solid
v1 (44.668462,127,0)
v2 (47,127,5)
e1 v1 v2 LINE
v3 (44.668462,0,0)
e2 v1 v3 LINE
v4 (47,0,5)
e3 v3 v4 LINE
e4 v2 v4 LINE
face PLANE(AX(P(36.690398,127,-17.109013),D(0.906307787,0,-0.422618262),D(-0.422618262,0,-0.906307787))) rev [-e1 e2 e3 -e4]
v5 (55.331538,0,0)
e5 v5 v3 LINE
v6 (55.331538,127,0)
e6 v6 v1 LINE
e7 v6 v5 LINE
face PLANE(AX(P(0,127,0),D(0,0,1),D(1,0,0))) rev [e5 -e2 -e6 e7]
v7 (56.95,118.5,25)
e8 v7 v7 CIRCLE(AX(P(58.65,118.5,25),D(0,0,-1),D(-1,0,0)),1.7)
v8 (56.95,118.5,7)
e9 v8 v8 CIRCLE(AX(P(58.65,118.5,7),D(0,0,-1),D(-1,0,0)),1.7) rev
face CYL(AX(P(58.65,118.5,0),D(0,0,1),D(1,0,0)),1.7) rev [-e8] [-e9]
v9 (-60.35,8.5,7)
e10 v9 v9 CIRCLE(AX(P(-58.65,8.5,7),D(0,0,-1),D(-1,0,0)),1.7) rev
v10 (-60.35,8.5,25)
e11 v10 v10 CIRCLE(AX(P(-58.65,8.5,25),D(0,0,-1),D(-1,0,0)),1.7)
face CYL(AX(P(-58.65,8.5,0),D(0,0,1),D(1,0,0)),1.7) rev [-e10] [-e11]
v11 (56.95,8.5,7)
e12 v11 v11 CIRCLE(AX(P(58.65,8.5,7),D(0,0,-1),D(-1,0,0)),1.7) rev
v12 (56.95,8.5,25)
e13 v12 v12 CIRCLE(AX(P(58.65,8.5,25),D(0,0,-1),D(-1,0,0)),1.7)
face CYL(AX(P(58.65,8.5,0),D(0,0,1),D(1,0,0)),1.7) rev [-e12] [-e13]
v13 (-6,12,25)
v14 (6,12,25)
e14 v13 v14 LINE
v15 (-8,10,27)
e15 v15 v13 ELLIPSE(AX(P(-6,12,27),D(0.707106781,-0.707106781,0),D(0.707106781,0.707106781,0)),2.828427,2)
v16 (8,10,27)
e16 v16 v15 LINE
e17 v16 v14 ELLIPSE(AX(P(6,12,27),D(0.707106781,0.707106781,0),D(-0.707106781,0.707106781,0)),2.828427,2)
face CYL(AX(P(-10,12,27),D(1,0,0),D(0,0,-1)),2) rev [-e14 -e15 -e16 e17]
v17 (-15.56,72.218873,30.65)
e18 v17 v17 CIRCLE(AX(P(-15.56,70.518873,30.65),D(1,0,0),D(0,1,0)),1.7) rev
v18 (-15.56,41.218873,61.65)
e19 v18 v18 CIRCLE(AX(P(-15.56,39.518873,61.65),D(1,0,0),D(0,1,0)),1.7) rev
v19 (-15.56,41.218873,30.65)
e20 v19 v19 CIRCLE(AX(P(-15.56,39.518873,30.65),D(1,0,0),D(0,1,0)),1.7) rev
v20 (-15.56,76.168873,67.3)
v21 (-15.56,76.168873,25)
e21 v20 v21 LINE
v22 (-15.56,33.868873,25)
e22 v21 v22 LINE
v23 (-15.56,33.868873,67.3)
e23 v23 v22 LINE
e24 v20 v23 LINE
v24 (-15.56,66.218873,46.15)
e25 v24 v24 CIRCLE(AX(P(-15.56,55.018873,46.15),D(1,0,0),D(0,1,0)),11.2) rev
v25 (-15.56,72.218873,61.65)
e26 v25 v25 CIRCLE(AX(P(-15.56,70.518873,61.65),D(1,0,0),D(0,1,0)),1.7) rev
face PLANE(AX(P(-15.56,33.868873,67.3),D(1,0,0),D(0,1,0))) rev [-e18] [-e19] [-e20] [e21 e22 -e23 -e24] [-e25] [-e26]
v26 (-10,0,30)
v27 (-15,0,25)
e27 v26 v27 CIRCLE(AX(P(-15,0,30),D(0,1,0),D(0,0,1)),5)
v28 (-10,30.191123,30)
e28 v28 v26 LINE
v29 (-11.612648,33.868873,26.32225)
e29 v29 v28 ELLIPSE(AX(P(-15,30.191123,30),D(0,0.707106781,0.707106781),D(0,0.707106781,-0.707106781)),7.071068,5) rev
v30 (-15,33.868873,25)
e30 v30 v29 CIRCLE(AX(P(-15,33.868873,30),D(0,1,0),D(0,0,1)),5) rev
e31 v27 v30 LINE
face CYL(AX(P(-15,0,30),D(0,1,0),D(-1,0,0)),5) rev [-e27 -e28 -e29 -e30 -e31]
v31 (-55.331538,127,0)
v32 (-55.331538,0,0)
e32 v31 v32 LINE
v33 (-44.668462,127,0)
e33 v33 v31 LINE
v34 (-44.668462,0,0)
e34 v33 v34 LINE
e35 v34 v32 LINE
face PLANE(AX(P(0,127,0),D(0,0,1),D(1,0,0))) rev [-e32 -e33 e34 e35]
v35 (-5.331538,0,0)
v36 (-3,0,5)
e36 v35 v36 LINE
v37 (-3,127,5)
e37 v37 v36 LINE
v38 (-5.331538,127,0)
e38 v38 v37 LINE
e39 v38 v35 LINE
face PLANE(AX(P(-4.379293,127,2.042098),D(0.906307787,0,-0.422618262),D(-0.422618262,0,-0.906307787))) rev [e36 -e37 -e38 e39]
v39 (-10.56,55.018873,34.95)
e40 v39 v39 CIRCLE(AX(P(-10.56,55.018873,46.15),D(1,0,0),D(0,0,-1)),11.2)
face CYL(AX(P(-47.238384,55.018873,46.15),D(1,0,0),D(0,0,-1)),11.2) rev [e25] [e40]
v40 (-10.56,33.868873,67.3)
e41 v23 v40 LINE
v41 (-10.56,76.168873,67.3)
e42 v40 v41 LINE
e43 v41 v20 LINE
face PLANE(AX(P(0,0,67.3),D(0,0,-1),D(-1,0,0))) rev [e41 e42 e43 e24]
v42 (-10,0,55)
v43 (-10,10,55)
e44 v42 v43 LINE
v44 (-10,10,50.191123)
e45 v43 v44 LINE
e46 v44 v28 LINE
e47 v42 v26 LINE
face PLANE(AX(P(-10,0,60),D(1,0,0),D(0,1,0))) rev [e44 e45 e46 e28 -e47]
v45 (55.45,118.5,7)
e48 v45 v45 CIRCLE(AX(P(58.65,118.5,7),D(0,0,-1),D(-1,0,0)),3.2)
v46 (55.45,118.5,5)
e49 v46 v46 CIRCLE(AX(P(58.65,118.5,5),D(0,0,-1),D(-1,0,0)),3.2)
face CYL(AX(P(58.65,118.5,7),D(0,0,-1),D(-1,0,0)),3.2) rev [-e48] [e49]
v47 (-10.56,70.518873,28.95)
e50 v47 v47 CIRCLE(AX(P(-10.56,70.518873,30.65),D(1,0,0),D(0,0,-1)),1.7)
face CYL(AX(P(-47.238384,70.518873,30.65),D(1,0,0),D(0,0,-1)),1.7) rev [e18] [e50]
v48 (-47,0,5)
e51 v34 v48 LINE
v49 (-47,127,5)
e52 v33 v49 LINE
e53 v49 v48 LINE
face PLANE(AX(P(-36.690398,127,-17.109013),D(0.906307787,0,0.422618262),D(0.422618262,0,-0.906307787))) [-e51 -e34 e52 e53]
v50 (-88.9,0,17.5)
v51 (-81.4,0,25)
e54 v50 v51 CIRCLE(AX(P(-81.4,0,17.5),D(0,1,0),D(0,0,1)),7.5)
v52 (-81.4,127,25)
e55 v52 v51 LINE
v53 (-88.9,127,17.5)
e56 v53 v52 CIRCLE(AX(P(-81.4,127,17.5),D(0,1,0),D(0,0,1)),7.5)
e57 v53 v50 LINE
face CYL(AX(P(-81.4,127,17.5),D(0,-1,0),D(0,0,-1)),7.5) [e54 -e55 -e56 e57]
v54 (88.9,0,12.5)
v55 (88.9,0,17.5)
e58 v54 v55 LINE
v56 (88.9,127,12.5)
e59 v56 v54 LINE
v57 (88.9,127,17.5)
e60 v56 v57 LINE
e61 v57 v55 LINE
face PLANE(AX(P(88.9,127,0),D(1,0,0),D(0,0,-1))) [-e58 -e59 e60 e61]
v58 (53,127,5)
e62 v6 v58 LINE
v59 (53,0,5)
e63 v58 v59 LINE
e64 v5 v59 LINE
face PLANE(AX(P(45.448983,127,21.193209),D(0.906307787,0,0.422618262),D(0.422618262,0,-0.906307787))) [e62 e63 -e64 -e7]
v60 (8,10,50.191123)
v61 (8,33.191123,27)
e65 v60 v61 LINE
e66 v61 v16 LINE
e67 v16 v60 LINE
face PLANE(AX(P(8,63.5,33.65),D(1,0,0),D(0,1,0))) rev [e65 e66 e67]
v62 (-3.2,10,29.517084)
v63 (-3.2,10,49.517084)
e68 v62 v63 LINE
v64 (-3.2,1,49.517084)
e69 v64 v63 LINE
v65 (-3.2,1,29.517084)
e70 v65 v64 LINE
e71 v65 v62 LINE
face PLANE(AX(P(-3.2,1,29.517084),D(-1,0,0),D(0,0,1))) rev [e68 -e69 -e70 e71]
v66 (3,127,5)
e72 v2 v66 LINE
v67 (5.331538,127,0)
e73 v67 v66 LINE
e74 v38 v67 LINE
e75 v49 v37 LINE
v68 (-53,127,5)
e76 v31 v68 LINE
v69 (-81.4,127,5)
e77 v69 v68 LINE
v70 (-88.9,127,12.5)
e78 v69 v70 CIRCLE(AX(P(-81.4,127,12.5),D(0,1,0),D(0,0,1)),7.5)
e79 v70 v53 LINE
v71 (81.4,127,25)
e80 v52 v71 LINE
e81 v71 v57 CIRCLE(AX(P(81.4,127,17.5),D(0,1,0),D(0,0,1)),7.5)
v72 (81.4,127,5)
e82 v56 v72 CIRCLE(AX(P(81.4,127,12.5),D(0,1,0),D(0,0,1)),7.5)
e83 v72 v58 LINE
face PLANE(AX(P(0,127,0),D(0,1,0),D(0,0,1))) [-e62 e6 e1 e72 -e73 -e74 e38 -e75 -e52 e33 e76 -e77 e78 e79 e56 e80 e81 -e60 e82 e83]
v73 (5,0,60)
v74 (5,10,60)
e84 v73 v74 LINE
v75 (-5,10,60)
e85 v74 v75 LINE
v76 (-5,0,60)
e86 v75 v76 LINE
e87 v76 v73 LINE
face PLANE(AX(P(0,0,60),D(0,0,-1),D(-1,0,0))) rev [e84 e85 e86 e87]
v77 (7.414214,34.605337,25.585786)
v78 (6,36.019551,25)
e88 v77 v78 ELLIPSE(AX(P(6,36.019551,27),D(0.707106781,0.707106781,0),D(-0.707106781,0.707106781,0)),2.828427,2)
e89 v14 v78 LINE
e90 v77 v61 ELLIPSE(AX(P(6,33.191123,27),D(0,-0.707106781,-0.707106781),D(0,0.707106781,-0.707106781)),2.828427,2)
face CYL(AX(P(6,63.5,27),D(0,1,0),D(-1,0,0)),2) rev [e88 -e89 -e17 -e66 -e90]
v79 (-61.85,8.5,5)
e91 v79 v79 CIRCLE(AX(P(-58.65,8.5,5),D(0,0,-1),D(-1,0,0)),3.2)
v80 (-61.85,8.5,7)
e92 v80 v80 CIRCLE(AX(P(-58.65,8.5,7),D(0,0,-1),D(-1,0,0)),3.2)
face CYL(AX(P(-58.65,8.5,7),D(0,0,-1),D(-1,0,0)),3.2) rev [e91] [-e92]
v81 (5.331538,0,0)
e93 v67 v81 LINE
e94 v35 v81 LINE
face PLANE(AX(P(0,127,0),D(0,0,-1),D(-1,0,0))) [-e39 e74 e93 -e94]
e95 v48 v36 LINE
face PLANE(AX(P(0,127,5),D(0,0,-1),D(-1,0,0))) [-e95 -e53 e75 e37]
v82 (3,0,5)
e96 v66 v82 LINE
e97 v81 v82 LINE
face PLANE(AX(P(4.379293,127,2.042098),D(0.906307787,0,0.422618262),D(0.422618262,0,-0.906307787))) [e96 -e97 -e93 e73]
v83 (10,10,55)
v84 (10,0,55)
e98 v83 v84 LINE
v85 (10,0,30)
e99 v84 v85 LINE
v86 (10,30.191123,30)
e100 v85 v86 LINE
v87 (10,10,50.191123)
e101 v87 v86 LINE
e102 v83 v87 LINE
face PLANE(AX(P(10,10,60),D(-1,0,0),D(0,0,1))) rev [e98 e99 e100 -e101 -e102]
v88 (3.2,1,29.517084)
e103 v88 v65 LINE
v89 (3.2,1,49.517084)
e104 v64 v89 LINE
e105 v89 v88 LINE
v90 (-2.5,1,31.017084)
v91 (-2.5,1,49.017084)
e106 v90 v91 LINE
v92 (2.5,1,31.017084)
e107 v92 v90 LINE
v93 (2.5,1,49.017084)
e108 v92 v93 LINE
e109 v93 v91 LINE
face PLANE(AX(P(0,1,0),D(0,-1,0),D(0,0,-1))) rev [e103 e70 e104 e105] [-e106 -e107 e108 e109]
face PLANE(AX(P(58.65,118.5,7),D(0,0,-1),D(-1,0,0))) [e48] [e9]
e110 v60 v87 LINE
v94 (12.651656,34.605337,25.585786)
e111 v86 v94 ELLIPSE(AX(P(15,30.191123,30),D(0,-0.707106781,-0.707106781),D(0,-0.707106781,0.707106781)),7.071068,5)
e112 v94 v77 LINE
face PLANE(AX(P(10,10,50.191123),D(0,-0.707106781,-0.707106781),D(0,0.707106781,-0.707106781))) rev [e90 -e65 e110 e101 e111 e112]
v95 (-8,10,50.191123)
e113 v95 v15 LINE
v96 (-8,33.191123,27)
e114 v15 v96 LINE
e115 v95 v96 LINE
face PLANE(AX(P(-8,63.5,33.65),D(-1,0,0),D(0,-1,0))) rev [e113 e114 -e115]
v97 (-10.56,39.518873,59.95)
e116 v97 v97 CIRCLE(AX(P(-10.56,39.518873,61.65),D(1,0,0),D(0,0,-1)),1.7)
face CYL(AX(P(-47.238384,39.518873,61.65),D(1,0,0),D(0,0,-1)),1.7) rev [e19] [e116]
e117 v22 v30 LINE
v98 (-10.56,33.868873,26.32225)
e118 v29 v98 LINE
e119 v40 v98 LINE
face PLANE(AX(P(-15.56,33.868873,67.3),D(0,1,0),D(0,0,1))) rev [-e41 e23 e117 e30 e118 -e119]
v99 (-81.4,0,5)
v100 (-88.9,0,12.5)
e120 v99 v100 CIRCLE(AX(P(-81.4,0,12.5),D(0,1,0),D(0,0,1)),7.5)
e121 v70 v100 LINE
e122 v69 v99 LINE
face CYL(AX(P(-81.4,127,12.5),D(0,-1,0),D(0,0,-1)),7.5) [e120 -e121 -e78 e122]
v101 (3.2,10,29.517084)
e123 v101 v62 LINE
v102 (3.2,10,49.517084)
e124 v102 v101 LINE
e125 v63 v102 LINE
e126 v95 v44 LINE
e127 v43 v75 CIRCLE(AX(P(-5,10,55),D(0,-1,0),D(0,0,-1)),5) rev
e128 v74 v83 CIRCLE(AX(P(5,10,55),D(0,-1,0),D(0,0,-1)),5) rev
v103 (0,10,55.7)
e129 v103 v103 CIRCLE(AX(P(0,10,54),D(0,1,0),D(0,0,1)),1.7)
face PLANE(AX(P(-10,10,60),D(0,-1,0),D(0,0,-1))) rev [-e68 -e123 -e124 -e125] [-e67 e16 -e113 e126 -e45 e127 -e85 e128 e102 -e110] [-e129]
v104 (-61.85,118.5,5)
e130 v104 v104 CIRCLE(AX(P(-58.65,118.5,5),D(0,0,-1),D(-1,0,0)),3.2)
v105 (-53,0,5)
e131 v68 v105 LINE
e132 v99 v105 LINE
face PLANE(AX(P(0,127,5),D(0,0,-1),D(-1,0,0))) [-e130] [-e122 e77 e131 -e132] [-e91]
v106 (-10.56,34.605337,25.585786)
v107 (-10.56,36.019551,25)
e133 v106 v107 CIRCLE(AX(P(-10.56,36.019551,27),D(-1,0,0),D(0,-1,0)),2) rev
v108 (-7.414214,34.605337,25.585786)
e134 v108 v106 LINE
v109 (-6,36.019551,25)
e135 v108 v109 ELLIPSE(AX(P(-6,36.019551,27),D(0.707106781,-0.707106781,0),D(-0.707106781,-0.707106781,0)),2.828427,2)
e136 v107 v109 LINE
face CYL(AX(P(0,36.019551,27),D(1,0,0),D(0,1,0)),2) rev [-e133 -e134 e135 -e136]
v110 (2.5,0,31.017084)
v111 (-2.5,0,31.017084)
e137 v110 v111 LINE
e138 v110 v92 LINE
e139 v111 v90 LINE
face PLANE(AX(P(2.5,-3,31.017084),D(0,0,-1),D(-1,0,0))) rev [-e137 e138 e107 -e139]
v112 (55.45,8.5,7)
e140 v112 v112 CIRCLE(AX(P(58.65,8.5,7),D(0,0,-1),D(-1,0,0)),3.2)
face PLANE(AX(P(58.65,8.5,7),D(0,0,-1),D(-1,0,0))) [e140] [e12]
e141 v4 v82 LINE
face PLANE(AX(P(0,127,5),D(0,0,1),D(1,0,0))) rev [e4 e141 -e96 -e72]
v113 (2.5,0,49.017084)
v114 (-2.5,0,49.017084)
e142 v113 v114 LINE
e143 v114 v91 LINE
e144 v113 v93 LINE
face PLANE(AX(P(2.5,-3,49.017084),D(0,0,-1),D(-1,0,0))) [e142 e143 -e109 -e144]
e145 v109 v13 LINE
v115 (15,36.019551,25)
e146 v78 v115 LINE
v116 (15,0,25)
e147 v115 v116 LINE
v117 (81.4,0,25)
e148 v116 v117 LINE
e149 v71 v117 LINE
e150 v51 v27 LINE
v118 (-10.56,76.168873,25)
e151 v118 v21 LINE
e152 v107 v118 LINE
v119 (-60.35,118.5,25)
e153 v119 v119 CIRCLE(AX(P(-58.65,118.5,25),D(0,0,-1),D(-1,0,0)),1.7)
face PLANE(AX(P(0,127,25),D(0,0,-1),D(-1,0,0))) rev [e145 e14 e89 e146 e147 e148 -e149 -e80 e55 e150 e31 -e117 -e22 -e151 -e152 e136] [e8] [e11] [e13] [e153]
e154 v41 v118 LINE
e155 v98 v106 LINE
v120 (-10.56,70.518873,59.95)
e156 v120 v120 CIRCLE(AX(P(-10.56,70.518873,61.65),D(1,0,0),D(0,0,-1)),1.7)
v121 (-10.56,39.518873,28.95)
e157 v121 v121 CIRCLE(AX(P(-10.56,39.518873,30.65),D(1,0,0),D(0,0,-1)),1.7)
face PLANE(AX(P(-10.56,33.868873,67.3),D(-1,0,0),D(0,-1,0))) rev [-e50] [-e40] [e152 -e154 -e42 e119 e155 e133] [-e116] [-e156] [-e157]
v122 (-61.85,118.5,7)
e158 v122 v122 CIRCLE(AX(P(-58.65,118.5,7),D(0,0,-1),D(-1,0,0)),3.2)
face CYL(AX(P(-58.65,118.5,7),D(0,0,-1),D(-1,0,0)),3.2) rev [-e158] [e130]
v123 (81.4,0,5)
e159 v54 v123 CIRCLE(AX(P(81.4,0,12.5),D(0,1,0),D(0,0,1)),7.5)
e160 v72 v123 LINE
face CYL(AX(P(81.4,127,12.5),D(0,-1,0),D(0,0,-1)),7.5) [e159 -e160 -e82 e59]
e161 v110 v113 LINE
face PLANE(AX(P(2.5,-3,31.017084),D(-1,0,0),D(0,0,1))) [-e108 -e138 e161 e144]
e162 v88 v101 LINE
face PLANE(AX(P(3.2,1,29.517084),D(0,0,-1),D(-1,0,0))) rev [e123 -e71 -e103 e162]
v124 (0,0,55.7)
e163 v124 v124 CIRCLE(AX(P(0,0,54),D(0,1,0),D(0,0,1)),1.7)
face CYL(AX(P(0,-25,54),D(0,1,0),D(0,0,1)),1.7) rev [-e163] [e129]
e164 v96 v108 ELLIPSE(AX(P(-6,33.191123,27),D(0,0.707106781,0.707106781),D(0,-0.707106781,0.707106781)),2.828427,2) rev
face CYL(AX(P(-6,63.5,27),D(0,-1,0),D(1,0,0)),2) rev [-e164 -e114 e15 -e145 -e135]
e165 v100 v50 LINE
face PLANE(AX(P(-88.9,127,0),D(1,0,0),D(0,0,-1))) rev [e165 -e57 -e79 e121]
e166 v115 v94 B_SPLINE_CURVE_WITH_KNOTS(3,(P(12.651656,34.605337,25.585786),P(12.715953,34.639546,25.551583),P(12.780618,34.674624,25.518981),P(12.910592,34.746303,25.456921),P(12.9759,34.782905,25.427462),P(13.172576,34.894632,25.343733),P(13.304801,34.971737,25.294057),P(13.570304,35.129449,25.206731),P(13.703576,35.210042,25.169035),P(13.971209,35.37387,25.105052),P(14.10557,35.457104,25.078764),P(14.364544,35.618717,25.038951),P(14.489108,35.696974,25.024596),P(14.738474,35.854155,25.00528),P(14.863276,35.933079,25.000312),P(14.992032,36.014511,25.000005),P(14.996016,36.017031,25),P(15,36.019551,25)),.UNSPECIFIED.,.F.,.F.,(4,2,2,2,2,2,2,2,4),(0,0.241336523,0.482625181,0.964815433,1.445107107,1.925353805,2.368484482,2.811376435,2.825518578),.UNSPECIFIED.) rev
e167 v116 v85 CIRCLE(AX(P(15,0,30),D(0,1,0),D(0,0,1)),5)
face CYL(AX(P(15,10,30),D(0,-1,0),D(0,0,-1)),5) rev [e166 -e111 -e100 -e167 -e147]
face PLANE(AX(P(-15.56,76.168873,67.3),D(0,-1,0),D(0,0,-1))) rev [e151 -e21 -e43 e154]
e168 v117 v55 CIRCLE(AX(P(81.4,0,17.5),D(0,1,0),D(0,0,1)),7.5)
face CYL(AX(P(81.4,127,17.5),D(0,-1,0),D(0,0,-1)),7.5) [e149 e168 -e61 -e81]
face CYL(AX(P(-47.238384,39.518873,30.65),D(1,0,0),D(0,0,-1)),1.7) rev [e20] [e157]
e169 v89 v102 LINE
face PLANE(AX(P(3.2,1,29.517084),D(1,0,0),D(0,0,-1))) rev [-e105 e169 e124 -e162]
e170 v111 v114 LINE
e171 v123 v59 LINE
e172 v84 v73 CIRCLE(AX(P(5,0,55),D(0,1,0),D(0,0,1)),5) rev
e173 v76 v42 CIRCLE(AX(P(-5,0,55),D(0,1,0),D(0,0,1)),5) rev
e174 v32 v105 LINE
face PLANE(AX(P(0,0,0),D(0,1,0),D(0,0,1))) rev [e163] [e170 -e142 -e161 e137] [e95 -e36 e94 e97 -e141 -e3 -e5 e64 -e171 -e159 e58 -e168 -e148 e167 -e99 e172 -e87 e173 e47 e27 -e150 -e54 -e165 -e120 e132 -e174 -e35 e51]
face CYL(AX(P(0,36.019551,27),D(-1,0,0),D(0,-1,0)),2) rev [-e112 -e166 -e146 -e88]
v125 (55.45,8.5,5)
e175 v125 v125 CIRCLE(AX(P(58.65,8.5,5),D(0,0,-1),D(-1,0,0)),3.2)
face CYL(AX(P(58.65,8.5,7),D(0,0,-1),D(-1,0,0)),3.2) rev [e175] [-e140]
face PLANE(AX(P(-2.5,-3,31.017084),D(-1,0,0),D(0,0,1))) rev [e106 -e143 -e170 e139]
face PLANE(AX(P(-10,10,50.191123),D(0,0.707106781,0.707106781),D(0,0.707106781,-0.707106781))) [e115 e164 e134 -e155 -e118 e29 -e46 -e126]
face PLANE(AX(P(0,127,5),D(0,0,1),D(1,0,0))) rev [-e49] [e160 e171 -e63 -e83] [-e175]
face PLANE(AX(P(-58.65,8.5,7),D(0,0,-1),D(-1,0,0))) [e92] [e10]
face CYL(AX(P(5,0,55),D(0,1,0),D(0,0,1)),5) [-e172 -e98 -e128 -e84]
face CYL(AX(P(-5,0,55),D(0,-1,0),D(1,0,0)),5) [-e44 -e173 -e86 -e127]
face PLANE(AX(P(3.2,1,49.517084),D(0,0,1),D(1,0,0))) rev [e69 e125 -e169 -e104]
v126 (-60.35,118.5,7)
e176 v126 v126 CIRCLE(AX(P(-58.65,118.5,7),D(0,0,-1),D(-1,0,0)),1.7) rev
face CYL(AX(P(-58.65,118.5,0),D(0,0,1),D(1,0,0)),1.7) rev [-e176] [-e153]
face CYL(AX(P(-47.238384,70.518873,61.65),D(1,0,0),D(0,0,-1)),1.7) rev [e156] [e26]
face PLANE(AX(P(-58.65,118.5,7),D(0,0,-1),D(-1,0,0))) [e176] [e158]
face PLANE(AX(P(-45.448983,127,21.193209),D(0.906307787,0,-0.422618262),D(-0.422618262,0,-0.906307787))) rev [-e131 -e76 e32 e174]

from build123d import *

# Parameters (mm, degrees)
BOSS_EXTRUDE1_DEPTH     = 127
SKETCH3_W               = 5
SKETCH3_H               = 42.3
BOSS_EXTRUDE2_DEPTH     = 42.3
SKETCH4_R               = 1.7
CUT_EXTRUDE1_DEPTH      = 5
CUT_EXTRUDE7_DEPTH      = 161.690696682
CUT_EXTRUDE7_DEPTH_BACK = 161.690696682
SKETCH5_R               = 1.7
SKETCH8_R               = 3.2
CUT_EXTRUDE8_DEPTH      = 2
SKETCH10_W              = 20
SKETCH10_H              = 10
BOSS_EXTRUDE3_DEPTH     = 35
FILLET3_R               = 5
SKETCH12_R              = 1.7
CUT_EXTRUDE9_DEPTH      = 35
RIB47_START             = -2
RIB47_DEPTH             = 2
FILLET7_R               = 5
FILLET8_R               = 2
SKETCH18_W              = 6.4
SKETCH18_H              = 20
CUT_EXTRUDE10_DEPTH     = 9
SKETCH19_W              = 5
SKETCH19_H              = 18
CUT_EXTRUDE11_DEPTH     = 4


# Read off the part's stored shape, not the designer's step: Rib47
with BuildPart() as part:
    # Sketch2 → Boss-Extrude1 (new body)
    with BuildSketch(Plane(origin=(0, 0, 0), x_dir=(1, 0, 0), z_dir=(0, 1, 0))):
        with BuildLine():
            Line((-5.331538291, 0), (-3, -5))
            Line((-3, -5), (-47, -5))
            Line((-47, -5), (-44.668461709, 0))
            Line((-44.668461709, 0), (-55.331538291, 0))
            Line((-55.331538291, 0), (-53, -5))
            Line((-53, -5), (-81.4, -5))
            ThreePointArc((-81.4, -5), (-86.703300859, -7.196699141), (-88.9, -12.5))
            Line((-88.9, -12.5), (-88.9, -17.5))
            ThreePointArc((-88.9, -17.5), (-86.703300859, -22.803300859), (-81.4, -25))
            Line((-81.4, -25), (81.4, -25))
            ThreePointArc((81.4, -25), (86.703300859, -22.803300859), (88.9, -17.5))
            Line((88.9, -17.5), (88.9, -12.5))
            ThreePointArc((88.9, -12.5), (86.703300859, -7.196699141), (81.4, -5))
            Line((81.4, -5), (53, -5))
            Line((53, -5), (55.331538291, 0))
            Line((55.331538291, 0), (44.668461709, 0))
            Line((44.668461709, 0), (47, -5))
            Line((47, -5), (3, -5))
            Line((3, -5), (5.331538291, 0))
            Line((5.331538291, 0), (-5.331538291, 0))
        make_face()
    extrude(amount=BOSS_EXTRUDE1_DEPTH)

    # Sketch3 → Boss-Extrude2 (add)
    with BuildSketch(Plane.XY.offset(25)):
        with Locations((-13.06, 55.018873206)):
            Rectangle(SKETCH3_W, SKETCH3_H)
    extrude(amount=BOSS_EXTRUDE2_DEPTH)

    # Sketch4 → Cut-Extrude1 (cut)
    with BuildSketch(Plane(origin=(-10.56, 0, 0), x_dir=(0, 0, -1), z_dir=(1, 0, 0))):
        with BuildLine():
            ThreePointArc((-34.95, 55.018873206), (-46.15, 66.218873206), (-57.35, 55.018873206))
            Line((-57.35, 55.018873206), (-34.95, 55.018873206))
        make_face()
        with BuildLine():
            Line((-34.95, 55.018873206), (-57.35, 55.018873206))
            ThreePointArc((-57.35, 55.018873206), (-46.15, 43.818873206), (-34.95, 55.018873206))
        make_face()
        with Locations((-61.65, 70.518873206)):
            Circle(SKETCH4_R)
        with Locations((-30.65, 70.518873206)):
            Circle(SKETCH4_R)
        with Locations((-30.65, 39.518873206)):
            Circle(SKETCH4_R)
        with Locations((-61.65, 39.518873206)):
            Circle(SKETCH4_R)
    extrude(amount=-CUT_EXTRUDE1_DEPTH, mode=Mode.SUBTRACT)

    # Sketch5 → Cut-Extrude7 (cut, two sides: drawn at the far end of the back side and taken through both)
    with BuildSketch(Plane.XY.offset(25).offset(-CUT_EXTRUDE7_DEPTH_BACK)):
        with Locations(Location((-58.65, 118.5, 0), (0, 0, 180))):
            Circle(SKETCH5_R)
        with Locations((58.65, 118.5)):
            Circle(SKETCH5_R)
        with Locations((58.65, 8.5)):
            Circle(SKETCH5_R)
        with Locations(Location((-58.65, 8.5, 0), (0, 0, 180))):
            Circle(SKETCH5_R)
    extrude(amount=CUT_EXTRUDE7_DEPTH + CUT_EXTRUDE7_DEPTH_BACK, mode=Mode.SUBTRACT)

    # Sketch8 → Cut-Extrude8 (cut)
    with BuildSketch(Plane(origin=(0, 0, 5), x_dir=(-1, 0, 0), z_dir=(0, 0, -1))):
        with Locations((-58.65, 118.5)):
            Circle(SKETCH8_R)
        with Locations((-58.65, 8.5)):
            Circle(SKETCH8_R)
        with Locations((58.65, 118.5)):
            Circle(SKETCH8_R)
        with Locations((58.65, 8.5)):
            Circle(SKETCH8_R)
    extrude(amount=-CUT_EXTRUDE8_DEPTH, mode=Mode.SUBTRACT)

    # Sketch10 → Boss-Extrude3 (add)
    with BuildSketch(Plane.XY.offset(25)):
        with Locations((0, 5)):
            Rectangle(SKETCH10_W, SKETCH10_H)
    extrude(amount=BOSS_EXTRUDE3_DEPTH)

    # Fillet3
    fillet3_edges = [part.edges().sort_by_distance(p)[0] for p in [
        (-10, 5, 60),
        (10, 5, 60),
    ]]
    fillet(fillet3_edges, radius=FILLET3_R)

    # Sketch12 → Cut-Extrude9 (cut)
    with BuildSketch(Plane(origin=(0, 10, 0), x_dir=(1, 0, 0), z_dir=(0, 1, 0))):
        with Locations(Location((0, -54, 0), (0, 0, 270))):
            Circle(SKETCH12_R)
    extrude(amount=-CUT_EXTRUDE9_DEPTH, mode=Mode.SUBTRACT)

    # Rib47 outline → Rib47 (add)
    with BuildSketch(Plane(origin=(10, 0, 0), x_dir=(0, 0, -1), z_dir=(1, 0, 0)).offset(RIB47_START)):
        Polygon((-25, 35.191123447), (-50.191123447, 10), (-25, 10), align=None)
    rib47 = extrude(amount=RIB47_DEPTH)

    # Mirror1: Rib47 across plane
    add(rib47.mirror(Plane(origin=(0, 0, 0), x_dir=(0, 0, 1), z_dir=(1, 0, 0))))

    # Fillet7
    # the kernel refuses this fillet: 5 mm, written as the material it adds along each edge
    with BuildSketch(Plane(origin=(-10, 47.691123447, 25), x_dir=(-1, 0, 0), z_dir=(0, -1, 0))) as fillet7_piece_1_section:
        with BuildLine():
            CenterArc((FILLET7_R, -FILLET7_R), FILLET7_R, 90, 90)
            Line((0, -FILLET7_R), (0, 0))
            Line((0, 0), (FILLET7_R, 0))
        make_face()
    fillet7_piece_1 = extrude(amount=47.691123447, mode=Mode.PRIVATE)
    fillet7_piece_1 = split(fillet7_piece_1, bisect_by=Plane(origin=(-11.152129269, 25.569946894, 34.621176553), z_dir=(0, -0.7071067811865476, -0.7071067811865476)), keep=Keep.TOP, mode=Mode.PRIVATE)
    add(fillet7_piece_1)
    with BuildSketch(Plane(origin=(10, 47.691123447, 25), x_dir=(0, 0, 1), z_dir=(0, -1, 0))) as fillet7_piece_2_section:
        with BuildLine():
            CenterArc((FILLET7_R, -FILLET7_R), FILLET7_R, 90, 90)
            Line((0, -FILLET7_R), (0, 0))
            Line((0, 0), (FILLET7_R, 0))
        make_face()
    fillet7_piece_2 = extrude(amount=47.691123447, mode=Mode.PRIVATE)
    fillet7_piece_2 = split(fillet7_piece_2, bisect_by=Plane(origin=(11.152129269, 25.569946894, 34.621176553), z_dir=(0, -0.7071067811865476, -0.7071067811865476)), keep=Keep.TOP, mode=Mode.PRIVATE)
    add(fillet7_piece_2)

    # Fillet8
    fillet8_edges = [part.edges().sort_by_distance(p)[0] for p in [
        (0, 10, 25),
        (8, 22.595561724, 25),
        (11.5, 35.191123447, 25),
        (-9.28, 35.191123447, 25),
        (-8, 22.595561724, 25),
    ]]
    fillet(fillet8_edges, radius=FILLET8_R)

    # Sketch18 → Cut-Extrude10 (cut)
    with BuildSketch(Plane(origin=(0, 10, 0), x_dir=(1, 0, 0), z_dir=(0, 1, 0))):
        with Locations((0, -39.517084206)):
            Rectangle(SKETCH18_W, SKETCH18_H)
    extrude(amount=-CUT_EXTRUDE10_DEPTH, mode=Mode.SUBTRACT)

    # Sketch19 → Cut-Extrude11 (cut)
    with BuildSketch(Plane(origin=(0, 1, 0), x_dir=(1, 0, 0), z_dir=(0, 1, 0))):
        with Locations((0, -40.017084206)):
            Rectangle(SKETCH19_W, SKETCH19_H)
    extrude(amount=-CUT_EXTRUDE11_DEPTH, mode=Mode.SUBTRACT)


solid = part.part
